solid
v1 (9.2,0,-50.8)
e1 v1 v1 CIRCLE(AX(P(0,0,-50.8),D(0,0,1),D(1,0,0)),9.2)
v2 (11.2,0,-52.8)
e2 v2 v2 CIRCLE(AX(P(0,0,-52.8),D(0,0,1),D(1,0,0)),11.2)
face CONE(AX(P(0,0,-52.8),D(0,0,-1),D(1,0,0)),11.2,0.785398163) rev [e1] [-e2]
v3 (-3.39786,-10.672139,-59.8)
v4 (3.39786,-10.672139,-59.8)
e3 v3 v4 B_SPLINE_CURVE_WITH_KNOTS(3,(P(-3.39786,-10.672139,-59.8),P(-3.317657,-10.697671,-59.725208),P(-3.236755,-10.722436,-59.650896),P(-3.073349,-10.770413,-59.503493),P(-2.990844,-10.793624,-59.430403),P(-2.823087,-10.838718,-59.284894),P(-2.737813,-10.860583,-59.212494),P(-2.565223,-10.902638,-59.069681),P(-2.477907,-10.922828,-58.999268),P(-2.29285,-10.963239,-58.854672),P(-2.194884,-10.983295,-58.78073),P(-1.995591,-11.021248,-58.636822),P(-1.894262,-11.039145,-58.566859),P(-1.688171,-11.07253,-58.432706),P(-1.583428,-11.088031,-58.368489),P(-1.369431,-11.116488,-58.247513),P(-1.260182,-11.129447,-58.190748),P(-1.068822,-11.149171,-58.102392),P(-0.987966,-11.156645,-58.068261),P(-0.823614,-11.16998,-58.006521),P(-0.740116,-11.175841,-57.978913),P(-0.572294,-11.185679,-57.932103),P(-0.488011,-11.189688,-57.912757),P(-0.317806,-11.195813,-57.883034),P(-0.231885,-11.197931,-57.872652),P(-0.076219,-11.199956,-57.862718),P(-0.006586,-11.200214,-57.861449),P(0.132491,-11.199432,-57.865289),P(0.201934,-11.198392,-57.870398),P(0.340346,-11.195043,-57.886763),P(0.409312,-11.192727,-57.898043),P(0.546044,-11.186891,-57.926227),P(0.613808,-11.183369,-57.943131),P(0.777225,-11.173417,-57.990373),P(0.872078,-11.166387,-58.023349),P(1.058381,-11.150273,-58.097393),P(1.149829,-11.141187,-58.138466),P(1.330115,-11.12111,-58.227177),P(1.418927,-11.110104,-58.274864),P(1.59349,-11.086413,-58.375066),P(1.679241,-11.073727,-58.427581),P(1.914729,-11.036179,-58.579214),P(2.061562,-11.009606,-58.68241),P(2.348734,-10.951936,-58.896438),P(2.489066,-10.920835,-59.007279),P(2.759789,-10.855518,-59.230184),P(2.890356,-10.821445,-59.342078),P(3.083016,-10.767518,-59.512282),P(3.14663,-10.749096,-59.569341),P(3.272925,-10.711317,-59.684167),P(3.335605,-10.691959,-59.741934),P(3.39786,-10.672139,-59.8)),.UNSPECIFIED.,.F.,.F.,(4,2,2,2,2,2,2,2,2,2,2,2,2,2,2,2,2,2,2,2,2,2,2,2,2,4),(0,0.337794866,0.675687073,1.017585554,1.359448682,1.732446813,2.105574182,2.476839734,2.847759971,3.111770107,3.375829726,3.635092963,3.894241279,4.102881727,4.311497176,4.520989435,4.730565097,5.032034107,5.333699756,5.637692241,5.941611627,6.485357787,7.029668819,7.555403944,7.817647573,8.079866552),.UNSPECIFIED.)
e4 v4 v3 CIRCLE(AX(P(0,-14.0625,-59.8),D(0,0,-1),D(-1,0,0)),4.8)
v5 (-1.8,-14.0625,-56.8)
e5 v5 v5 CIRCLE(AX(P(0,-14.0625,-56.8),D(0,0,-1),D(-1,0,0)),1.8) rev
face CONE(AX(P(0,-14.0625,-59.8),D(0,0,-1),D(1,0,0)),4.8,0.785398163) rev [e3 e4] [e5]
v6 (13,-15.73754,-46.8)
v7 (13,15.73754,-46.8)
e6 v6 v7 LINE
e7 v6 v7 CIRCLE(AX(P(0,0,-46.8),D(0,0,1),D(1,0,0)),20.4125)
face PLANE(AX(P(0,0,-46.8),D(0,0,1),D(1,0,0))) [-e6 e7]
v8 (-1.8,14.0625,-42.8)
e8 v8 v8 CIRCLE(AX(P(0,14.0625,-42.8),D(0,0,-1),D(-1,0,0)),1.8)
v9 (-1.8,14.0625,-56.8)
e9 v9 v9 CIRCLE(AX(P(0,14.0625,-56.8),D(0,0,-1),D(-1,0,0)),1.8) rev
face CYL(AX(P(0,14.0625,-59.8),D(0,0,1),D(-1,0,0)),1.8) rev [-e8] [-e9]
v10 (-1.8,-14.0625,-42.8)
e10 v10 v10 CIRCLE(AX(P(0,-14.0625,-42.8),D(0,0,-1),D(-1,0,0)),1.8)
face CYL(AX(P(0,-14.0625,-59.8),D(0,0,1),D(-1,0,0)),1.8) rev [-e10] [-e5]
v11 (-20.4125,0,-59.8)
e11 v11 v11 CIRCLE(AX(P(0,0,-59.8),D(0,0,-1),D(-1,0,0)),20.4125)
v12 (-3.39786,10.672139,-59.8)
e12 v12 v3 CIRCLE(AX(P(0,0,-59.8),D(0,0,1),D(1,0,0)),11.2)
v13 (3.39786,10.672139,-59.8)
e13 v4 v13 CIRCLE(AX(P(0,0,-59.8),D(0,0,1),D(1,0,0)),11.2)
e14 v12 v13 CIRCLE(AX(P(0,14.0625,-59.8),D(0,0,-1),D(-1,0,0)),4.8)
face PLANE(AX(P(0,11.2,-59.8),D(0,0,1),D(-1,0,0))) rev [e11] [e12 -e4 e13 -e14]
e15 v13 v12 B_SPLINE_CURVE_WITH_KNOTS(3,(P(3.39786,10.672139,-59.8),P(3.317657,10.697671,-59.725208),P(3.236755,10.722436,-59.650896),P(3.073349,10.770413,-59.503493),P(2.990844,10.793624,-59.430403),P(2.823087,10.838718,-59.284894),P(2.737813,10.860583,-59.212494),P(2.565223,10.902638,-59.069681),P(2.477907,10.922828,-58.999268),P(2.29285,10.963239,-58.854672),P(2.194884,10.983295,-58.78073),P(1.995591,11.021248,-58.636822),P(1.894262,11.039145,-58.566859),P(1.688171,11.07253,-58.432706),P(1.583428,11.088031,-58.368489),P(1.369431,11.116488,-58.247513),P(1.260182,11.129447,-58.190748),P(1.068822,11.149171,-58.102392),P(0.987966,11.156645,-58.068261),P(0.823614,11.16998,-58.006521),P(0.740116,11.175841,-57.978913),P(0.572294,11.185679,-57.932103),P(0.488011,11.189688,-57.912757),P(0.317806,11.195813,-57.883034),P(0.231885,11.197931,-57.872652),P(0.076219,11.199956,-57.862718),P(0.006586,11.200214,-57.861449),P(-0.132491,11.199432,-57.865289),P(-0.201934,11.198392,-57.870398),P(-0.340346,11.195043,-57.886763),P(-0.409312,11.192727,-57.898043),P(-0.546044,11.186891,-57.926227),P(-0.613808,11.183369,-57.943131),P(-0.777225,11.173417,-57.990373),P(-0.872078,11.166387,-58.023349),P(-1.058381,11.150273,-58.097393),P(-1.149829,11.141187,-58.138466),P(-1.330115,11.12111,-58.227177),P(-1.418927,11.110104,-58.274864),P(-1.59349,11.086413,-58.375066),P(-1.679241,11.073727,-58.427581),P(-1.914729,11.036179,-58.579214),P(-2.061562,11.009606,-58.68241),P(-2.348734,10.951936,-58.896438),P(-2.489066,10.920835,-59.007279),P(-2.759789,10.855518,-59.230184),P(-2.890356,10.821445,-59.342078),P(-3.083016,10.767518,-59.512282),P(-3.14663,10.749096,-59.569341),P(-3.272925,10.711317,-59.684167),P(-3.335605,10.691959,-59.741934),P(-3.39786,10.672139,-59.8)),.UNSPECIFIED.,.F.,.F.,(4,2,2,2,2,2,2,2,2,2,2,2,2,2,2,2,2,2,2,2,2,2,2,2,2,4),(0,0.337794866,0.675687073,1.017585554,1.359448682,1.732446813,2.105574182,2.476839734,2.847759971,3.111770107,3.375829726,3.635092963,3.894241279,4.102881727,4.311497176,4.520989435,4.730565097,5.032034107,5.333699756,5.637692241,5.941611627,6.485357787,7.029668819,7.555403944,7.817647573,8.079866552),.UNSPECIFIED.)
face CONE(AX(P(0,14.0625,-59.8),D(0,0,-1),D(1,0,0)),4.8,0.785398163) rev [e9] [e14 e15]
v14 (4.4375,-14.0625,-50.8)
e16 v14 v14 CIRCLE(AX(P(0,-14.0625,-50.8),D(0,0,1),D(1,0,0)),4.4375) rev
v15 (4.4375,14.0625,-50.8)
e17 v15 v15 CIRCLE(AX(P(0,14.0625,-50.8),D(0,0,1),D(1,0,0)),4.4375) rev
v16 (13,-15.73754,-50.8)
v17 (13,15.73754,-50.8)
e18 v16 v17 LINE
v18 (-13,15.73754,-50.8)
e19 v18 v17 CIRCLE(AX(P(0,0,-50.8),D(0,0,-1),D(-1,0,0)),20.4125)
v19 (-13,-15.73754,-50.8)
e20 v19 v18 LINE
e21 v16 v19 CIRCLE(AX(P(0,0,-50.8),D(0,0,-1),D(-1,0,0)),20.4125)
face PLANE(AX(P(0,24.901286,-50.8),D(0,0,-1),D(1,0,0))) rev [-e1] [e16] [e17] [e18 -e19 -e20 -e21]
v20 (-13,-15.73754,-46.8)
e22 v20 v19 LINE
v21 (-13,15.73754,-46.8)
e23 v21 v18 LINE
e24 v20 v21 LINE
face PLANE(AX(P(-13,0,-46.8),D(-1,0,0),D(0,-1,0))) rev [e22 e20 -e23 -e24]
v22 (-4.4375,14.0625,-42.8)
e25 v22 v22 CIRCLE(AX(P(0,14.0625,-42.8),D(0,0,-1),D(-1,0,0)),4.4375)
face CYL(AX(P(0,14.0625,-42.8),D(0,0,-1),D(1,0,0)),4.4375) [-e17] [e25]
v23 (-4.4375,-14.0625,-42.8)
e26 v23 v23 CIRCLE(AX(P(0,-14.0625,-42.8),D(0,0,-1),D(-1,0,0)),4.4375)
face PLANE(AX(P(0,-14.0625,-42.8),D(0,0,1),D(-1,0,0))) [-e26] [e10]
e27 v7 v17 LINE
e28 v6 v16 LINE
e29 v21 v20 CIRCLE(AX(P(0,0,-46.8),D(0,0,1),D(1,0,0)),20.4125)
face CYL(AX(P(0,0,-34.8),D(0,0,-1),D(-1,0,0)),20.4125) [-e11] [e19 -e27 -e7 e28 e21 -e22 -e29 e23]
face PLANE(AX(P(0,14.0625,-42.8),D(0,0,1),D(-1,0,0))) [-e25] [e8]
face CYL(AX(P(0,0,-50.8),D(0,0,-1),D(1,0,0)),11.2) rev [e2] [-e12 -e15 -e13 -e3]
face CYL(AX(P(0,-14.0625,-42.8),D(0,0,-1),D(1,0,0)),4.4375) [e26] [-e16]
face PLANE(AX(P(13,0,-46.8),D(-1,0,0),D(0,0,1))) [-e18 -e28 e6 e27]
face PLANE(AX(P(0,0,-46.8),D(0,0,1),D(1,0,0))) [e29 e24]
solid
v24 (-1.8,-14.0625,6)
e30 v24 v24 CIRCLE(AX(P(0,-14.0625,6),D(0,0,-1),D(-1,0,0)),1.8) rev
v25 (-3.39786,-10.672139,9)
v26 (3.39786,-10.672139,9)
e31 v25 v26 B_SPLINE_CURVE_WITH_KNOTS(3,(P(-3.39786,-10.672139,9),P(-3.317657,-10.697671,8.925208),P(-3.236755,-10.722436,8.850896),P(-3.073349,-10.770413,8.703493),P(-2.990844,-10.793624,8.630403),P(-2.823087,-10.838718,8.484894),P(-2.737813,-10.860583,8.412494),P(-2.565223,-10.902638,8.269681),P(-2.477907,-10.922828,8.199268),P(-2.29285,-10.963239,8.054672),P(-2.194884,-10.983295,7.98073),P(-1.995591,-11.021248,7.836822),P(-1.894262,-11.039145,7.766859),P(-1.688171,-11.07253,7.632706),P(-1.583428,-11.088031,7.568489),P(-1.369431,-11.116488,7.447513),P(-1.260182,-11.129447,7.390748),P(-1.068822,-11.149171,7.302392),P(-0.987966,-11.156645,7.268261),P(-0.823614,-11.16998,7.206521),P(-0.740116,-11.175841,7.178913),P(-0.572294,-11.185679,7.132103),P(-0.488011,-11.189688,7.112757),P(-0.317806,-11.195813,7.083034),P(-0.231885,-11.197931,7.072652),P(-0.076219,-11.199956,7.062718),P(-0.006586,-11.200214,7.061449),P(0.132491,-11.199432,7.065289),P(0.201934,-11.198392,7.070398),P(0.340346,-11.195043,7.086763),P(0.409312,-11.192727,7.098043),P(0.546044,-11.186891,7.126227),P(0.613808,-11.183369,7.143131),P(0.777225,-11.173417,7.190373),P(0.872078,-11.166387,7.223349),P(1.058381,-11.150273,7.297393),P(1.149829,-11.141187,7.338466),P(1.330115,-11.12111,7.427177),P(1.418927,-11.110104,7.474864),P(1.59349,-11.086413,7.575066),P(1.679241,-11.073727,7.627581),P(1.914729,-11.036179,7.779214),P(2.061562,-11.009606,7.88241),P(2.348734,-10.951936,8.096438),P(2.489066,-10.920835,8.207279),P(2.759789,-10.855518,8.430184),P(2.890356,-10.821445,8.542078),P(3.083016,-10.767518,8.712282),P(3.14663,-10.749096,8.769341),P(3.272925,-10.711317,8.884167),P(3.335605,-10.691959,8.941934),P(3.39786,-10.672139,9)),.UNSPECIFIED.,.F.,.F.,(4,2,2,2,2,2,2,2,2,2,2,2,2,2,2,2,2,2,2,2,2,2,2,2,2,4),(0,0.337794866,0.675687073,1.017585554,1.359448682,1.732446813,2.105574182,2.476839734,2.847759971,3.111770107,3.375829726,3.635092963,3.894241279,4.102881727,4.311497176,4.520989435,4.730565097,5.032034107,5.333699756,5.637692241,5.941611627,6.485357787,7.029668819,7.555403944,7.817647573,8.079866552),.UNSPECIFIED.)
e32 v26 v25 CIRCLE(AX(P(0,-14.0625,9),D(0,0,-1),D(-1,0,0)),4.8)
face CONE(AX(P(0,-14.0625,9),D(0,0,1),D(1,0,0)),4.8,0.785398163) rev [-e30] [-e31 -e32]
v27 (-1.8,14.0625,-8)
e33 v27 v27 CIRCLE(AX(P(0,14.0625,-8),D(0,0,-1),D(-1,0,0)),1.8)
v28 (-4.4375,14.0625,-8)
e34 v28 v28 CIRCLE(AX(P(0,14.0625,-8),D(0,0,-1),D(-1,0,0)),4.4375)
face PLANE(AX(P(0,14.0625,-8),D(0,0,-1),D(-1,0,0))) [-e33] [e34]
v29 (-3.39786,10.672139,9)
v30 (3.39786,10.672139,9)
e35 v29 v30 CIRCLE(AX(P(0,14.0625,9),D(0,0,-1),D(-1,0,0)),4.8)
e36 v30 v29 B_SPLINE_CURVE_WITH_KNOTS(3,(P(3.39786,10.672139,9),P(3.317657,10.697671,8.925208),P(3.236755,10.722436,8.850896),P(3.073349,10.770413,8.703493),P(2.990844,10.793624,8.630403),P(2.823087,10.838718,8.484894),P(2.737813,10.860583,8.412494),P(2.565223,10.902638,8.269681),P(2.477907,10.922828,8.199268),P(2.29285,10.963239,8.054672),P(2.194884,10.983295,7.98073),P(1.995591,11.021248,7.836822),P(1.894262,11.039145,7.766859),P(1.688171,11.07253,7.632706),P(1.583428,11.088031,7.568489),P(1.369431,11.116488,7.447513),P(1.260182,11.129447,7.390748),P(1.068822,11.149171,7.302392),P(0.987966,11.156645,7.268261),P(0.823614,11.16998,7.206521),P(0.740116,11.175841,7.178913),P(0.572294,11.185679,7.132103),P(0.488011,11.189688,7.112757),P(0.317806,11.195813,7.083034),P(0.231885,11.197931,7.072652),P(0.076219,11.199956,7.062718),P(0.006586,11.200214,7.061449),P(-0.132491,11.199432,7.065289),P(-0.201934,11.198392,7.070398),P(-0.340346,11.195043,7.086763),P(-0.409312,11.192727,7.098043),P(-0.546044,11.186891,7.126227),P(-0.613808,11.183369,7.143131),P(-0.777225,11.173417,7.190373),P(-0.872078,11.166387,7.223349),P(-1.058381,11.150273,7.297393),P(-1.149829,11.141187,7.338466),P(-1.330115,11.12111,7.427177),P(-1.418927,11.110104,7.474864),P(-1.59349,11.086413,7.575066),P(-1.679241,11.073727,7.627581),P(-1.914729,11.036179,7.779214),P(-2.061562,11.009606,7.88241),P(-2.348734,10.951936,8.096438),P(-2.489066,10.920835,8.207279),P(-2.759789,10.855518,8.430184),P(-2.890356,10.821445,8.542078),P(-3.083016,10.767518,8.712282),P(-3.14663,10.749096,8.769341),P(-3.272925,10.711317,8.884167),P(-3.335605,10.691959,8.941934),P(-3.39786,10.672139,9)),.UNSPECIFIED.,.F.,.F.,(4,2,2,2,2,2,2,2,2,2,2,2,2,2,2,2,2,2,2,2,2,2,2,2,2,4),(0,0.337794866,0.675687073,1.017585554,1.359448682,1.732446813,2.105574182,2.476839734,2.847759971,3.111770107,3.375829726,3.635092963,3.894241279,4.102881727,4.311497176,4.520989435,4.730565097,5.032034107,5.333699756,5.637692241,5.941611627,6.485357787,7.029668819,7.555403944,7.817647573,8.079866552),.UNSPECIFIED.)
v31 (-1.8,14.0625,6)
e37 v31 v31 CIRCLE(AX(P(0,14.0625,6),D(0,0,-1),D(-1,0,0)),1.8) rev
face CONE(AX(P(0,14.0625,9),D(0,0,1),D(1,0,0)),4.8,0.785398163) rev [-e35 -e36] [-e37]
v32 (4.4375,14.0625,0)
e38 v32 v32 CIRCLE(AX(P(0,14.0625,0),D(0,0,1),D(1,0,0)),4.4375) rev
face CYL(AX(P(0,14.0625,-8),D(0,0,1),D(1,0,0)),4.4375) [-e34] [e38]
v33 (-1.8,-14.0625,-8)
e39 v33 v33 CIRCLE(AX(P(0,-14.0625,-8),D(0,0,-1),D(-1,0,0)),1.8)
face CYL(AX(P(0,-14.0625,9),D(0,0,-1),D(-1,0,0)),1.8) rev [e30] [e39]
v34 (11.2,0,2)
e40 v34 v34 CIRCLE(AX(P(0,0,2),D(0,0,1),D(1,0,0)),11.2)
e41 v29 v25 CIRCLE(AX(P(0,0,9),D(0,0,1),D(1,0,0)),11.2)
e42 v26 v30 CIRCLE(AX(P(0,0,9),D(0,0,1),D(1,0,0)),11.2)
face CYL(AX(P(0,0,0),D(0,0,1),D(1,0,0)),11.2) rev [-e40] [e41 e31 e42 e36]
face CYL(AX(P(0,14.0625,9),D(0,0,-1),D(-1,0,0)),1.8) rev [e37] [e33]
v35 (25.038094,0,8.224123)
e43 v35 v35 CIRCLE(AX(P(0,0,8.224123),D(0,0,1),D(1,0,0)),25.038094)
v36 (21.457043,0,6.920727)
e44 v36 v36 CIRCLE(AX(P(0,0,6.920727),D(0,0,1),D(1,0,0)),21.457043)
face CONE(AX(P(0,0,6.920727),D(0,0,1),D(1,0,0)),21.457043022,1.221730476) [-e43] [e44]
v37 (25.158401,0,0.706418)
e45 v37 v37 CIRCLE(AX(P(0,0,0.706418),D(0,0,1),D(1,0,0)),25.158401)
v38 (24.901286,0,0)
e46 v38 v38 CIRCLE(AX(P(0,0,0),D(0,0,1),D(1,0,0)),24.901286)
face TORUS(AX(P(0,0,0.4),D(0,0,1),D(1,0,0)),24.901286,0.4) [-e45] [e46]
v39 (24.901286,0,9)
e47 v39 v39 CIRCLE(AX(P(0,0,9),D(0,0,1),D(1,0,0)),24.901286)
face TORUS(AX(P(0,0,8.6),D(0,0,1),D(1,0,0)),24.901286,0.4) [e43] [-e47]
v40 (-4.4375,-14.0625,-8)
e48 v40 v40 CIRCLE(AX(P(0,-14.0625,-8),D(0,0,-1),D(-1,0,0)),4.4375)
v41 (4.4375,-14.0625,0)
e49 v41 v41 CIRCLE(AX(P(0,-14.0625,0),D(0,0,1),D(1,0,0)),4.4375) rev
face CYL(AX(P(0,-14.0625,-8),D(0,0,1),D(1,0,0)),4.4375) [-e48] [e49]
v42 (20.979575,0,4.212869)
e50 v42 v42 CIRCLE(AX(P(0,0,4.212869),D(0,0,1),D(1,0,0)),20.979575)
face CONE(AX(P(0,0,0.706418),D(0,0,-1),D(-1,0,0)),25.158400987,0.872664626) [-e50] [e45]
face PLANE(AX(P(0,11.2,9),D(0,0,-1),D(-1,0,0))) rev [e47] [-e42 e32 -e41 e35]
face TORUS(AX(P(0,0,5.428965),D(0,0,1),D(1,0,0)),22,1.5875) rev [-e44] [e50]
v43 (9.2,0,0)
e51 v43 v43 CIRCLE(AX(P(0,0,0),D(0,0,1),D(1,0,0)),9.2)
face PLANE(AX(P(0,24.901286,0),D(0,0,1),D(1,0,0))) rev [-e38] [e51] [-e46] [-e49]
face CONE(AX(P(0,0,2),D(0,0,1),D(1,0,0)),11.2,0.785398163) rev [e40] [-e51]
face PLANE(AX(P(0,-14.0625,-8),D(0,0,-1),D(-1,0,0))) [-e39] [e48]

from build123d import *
from build123d.topology import SkipClean

# Parameters (mm, degrees)
SKETCH3_R           = 4.4375
BOSS_EXTRUDE1_DEPTH = 8
SKETCH4_R           = 1.8
CUT_EXTRUDE1_DEPTH  = 40.614519446
CHAMFER1_SIZE       = 3
SKETCH8_R           = 31.218050182
SKETCH8_R_2         = 20.4125
CUT_EXTRUDE3_DEPTH  = 25
BOSS_EXTRUDE4_DEPTH = 4


with BuildPart() as part:
    # Sketch2 → Revolve1 (revolve)
    with BuildSketch(Plane(origin=(0, 0, 0), x_dir=(0, 0, -1), z_dir=(1, 0, 0)), mode=Mode.PRIVATE) as revolve1_sk:
        with BuildLine():
            Line((-2, 11.2), (-9, 11.2))
            Line((-9, 11.2), (-9, 24.901285943))
            ThreePointArc((-9, 24.901285943), (-8.669459271, 25.295209045), (-8.224122952, 25.038094001))
            Line((-8.224122952, 25.038094001), (-6.920726988, 21.457043022))
            ThreePointArc((-6.920726988, 21.457043022), (-5.704631435, 20.436617692), (-4.212869399, 20.97957467))
            Line((-4.212869399, 20.97957467), (-0.706417777, 25.158400987))
            ThreePointArc((-0.706417777, 25.158400987), (-0.263191943, 25.277162992), (0, 24.901285943))
            Line((0, 24.901285943), (0, 9.2))
            Line((0, 9.2), (-2, 11.2))
        make_face()
    revolve(revolve1_sk.sketch.rotate(Axis((0, 0, 0), (0, 0, -1)), 90), axis=Axis((0, 0, 0), (0, 0, -1)))

    # Sketch3 → Boss-Extrude1 (add)
    with BuildSketch(Plane(origin=(0, 0, 0), x_dir=(-1, 0, 0), z_dir=(0, 0, -1))):
        with Locations(Location((0, 14.0625, 0), (0, 0, 180))):
            Circle(SKETCH3_R)
        with Locations(Location((0, -14.0625, 0), (0, 0, 180))):
            Circle(SKETCH3_R)
    extrude(amount=BOSS_EXTRUDE1_DEPTH)

    # Sketch4 → Cut-Extrude1 (cut, through all)
    with BuildSketch(Plane(origin=(0, 0, -8), x_dir=(-1, 0, 0), z_dir=(0, 0, -1))):
        with Locations((0, 14.0625)):
            Circle(SKETCH4_R)
        with Locations((0, -14.0625)):
            Circle(SKETCH4_R)
    extrude(amount=-CUT_EXTRUDE1_DEPTH, mode=Mode.SUBTRACT)

    # Chamfer1
    # the kernel refuses this chamfer: 3 mm, written as the material it takes off along each edge
    with BuildSketch(Plane(origin=(0, 14.0625, 9), x_dir=(-1, 0, 0), z_dir=(0, -1, 0))) as chamfer1_piece_1:
        Polygon((1.8 + CHAMFER1_SIZE, 0), (1.8, CHAMFER1_SIZE), (1.8, 0), align=None)
    revolve(axis=Axis((0, 14.0625, 9), (0, 0, -1)), mode=Mode.SUBTRACT)
    with BuildSketch(Plane(origin=(0, -14.0625, 9), x_dir=(-1, 0, 0), z_dir=(0, -1, 0))) as chamfer1_piece_2:
        Polygon((1.8 + CHAMFER1_SIZE, 0), (1.8, CHAMFER1_SIZE), (1.8, 0), align=None)
    revolve(axis=Axis((0, -14.0625, 9), (0, 0, -1)), mode=Mode.SUBTRACT)


with BuildPart() as body_2:
    # Mirror2: mirrored copy
    add(part.part.mirror(Plane(origin=(0, 0, -25.4), x_dir=(1, 0, 0), z_dir=(0, 0, -1))))

    # Sketch8 → Cut-Extrude3 (cut)
    with BuildSketch(Plane(origin=(0, 0, -59.8), x_dir=(-1, 0, 0), z_dir=(0, 0, -1))):
        Circle(SKETCH8_R)
        Circle(SKETCH8_R_2, mode=Mode.SUBTRACT)
    extrude(amount=-CUT_EXTRUDE3_DEPTH, mode=Mode.SUBTRACT)

    # Sketch9 → Boss-Extrude4 (add)
    with SkipClean():  # the faces are left unmerged after this step: merging them gives an invalid solid
        with BuildSketch(Plane.XY.offset(-50.8)):
            with BuildLine():
                ThreePointArc((-13, 15.737539714), (-20.4125, 0), (-13, -15.737539714))
                Line((-13, -15.737539714), (-13, 15.737539714))
            make_face()
            with BuildLine():
                Line((13, 15.737539714), (13, -15.737539714))
                ThreePointArc((13, -15.737539714), (18.466627416, -8.697920908), (20.4125, 0))
                ThreePointArc((20.4125, 0), (18.466627416, 8.697920908), (13, 15.737539714))
            make_face()
        extrude(amount=BOSS_EXTRUDE4_DEPTH)


solid = Compound([part.part, body_2.part])
